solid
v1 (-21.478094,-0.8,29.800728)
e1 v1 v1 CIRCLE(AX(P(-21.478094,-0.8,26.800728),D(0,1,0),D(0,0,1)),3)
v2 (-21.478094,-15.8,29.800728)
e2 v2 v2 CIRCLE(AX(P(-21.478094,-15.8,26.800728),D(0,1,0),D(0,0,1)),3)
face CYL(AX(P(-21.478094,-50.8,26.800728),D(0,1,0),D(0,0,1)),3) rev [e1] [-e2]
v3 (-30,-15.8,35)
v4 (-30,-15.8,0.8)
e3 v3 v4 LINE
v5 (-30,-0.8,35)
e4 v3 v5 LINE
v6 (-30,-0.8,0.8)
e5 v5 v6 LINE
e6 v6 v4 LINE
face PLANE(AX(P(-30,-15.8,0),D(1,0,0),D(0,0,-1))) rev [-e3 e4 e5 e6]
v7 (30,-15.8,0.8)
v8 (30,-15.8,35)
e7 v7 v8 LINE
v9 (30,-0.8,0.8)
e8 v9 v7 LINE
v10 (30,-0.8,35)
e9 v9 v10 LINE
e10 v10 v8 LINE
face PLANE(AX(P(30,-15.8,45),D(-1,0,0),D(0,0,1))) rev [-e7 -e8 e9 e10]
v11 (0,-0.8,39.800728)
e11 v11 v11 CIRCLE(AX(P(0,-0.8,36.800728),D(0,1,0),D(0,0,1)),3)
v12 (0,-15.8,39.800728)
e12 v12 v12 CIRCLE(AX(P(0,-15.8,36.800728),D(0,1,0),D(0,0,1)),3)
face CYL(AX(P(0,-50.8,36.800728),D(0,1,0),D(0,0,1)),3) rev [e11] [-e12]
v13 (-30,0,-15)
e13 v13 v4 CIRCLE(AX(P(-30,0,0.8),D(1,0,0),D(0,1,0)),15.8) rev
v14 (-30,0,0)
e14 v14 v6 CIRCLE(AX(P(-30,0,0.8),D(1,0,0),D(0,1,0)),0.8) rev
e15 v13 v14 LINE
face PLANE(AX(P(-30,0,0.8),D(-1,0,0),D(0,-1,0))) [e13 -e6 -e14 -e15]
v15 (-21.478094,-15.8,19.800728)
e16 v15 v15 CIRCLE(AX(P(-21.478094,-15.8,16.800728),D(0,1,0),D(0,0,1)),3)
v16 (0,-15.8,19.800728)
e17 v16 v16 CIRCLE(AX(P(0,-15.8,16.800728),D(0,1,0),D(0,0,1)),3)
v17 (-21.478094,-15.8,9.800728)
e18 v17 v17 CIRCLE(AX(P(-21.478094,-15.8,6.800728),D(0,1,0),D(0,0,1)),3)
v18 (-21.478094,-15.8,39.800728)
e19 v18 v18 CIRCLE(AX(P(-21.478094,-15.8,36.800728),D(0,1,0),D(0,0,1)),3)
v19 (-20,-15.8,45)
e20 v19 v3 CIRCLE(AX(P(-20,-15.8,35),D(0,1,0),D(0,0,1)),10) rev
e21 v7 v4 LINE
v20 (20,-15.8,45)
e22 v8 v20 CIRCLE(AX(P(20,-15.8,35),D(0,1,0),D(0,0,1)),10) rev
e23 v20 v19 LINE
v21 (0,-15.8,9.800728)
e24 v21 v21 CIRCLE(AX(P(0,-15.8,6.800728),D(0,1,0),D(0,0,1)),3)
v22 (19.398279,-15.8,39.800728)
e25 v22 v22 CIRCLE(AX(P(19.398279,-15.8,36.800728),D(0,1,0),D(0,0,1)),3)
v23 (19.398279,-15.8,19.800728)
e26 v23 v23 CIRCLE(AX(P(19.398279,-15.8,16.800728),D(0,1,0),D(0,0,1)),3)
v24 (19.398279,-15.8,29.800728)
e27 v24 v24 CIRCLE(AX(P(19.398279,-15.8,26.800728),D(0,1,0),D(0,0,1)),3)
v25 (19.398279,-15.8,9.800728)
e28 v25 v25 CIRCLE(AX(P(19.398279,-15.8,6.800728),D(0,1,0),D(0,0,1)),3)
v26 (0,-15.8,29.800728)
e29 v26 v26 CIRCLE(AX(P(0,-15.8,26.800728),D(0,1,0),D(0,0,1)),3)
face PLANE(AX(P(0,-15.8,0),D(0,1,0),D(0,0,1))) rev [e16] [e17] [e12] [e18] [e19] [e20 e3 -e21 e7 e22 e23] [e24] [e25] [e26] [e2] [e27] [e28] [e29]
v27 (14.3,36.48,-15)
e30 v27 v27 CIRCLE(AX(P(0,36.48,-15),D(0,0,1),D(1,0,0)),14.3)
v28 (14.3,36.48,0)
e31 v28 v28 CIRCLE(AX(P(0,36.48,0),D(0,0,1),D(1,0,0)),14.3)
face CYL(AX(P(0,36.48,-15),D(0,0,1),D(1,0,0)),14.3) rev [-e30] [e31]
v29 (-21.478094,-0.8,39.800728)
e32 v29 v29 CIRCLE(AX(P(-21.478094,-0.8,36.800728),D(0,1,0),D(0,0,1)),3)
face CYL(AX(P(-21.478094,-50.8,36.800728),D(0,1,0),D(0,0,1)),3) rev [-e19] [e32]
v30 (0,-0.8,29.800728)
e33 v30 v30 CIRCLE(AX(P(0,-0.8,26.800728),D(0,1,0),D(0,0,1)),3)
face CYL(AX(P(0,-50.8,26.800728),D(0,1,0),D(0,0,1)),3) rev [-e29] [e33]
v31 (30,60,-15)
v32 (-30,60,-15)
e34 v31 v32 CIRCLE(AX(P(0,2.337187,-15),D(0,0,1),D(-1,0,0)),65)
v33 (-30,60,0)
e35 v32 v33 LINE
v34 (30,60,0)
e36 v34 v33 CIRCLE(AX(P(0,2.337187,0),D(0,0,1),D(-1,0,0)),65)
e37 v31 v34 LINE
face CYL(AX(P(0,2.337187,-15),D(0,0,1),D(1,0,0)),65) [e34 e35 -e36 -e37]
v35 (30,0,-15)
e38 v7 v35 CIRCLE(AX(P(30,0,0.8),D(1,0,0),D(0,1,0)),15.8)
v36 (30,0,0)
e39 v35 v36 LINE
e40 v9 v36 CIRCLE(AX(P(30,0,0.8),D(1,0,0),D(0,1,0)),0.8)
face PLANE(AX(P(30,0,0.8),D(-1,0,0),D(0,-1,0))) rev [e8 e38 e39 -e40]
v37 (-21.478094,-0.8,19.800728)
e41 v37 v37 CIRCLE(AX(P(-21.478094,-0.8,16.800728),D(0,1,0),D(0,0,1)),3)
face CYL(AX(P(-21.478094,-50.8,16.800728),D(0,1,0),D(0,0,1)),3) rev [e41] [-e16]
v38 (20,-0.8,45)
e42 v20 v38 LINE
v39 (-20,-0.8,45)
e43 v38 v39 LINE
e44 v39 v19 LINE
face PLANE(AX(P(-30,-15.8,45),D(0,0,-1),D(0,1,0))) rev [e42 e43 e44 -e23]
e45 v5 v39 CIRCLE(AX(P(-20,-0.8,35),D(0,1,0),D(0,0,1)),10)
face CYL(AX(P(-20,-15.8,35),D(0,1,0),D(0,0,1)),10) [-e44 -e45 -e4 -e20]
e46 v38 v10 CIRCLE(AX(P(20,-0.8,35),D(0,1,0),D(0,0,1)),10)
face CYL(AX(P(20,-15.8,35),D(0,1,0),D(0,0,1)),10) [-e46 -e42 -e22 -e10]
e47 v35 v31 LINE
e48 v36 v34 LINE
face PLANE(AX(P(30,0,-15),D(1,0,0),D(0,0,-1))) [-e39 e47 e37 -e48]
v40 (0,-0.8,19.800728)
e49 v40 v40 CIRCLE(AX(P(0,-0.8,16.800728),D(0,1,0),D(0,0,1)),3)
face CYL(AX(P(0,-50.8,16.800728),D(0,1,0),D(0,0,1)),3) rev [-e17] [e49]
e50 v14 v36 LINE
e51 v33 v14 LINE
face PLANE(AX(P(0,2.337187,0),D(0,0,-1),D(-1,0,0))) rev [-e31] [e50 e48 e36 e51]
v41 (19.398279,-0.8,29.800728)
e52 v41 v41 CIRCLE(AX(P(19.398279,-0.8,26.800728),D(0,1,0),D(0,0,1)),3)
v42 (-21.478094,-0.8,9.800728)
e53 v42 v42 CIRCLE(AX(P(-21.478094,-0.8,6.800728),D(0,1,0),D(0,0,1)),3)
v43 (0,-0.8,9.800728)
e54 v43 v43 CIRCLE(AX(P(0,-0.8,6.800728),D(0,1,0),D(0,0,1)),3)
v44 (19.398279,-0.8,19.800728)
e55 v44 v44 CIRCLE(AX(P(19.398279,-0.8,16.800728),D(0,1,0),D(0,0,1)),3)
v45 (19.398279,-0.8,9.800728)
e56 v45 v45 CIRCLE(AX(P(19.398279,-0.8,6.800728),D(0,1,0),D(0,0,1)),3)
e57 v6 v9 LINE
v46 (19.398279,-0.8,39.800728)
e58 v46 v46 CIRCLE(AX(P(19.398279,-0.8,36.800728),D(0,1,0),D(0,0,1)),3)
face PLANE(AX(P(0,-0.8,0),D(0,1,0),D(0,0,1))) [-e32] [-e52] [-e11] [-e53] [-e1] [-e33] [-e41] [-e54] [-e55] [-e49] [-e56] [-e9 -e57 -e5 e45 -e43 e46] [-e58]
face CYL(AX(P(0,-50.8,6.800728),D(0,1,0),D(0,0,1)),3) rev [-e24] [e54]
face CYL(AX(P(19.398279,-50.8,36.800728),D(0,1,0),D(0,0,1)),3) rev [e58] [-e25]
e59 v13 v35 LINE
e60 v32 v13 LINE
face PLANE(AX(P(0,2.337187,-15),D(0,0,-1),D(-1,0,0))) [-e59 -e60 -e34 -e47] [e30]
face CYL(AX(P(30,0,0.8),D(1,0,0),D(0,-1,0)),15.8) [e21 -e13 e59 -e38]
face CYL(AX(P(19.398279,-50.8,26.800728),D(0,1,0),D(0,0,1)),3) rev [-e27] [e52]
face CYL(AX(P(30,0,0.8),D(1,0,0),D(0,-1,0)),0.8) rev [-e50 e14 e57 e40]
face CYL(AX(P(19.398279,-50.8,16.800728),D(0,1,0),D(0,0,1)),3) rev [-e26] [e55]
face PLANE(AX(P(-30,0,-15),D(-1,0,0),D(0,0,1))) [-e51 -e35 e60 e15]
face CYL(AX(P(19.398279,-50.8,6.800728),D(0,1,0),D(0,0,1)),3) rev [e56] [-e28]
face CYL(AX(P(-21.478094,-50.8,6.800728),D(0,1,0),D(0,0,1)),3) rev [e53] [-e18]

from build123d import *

# Parameters (mm, degrees)
SKETCH1_R          = 14.3
BASE_FLANGE1_DEPTH = 15
EDGE_FLANGE1_DEPTH = 60
SKETCH9_R          = 3
CUT_EXTRUDE1_DEPTH = 50
FILLET1_R          = 10


# Sheet-metal steps are written as plain solids
with BuildPart() as part:
    # Sketch1 → Base-Flange1 (new body)
    with BuildSketch(Plane.XY):
        with BuildLine():
            Line((-30, 0), (30, 0))
            Line((30, 0), (30, 60))
            ThreePointArc((30, 60), (0, 67.337187027), (-30, 60))
            Line((-30, 60), (-30, 0))
        make_face()
        with Locations((0, 36.48)):
            Circle(SKETCH1_R, mode=Mode.SUBTRACT)
    extrude(amount=-BASE_FLANGE1_DEPTH)

    # Edge-Flange1 section (across the edge) → Edge-Flange1 (add)
    with BuildSketch(Plane(origin=(-30, -0.8, 0), x_dir=(0, 1, 0), z_dir=(1, 0, 0))):
        with BuildLine():
            Line((-15, 0.8), (-15, 45))
            Line((-15, 45), (0, 45))
            Line((0, 45), (0, 0.8))
            ThreePointArc((0, 0.8), (0.234314575, 0.234314575), (0.8, 0))
            Line((0.8, 0), (0.8, -15))
            ThreePointArc((0.8, -15), (-10.372287143, -10.372287143), (-15, 0.8))
        make_face()
    extrude(amount=EDGE_FLANGE1_DEPTH)

    # Sketch9 → Cut-Extrude1 (cut)
    with BuildSketch(Plane(origin=(0, -0.8, 0), x_dir=(1, 0, 0), z_dir=(0, 1, 0))):
        with Locations(Location((-21.478093951, -6.800727635, 0), (0, 0, 270))):
            Circle(SKETCH9_R)
        with Locations(Location((19.398278521, -6.800727635, 0), (0, 0, 270))):
            Circle(SKETCH9_R)
        with Locations(Location((0, -6.800727635, 0), (0, 0, 270))):
            Circle(SKETCH9_R)
        with Locations(Location((-21.478093951, -16.800727635, 0), (0, 0, 270))):
            Circle(SKETCH9_R)
        with Locations(Location((-21.478093951, -26.800727635, 0), (0, 0, 270))):
            Circle(SKETCH9_R)
        with Locations(Location((-21.478093951, -36.800727635, 0), (0, 0, 270))):
            Circle(SKETCH9_R)
        with Locations(Location((0, -16.800727635, 0), (0, 0, 270))):
            Circle(SKETCH9_R)
        with Locations(Location((0, -26.800727635, 0), (0, 0, 270))):
            Circle(SKETCH9_R)
        with Locations(Location((0, -36.800727635, 0), (0, 0, 270))):
            Circle(SKETCH9_R)
        with Locations(Location((19.398278521, -16.800727635, 0), (0, 0, 270))):
            Circle(SKETCH9_R)
        with Locations(Location((19.398278521, -26.800727635, 0), (0, 0, 270))):
            Circle(SKETCH9_R)
        with Locations(Location((19.398278521, -36.800727635, 0), (0, 0, 270))):
            Circle(SKETCH9_R)
    extrude(amount=-CUT_EXTRUDE1_DEPTH, mode=Mode.SUBTRACT)

    # Fillet1
    fillet1_edges = [part.edges().sort_by_distance(p)[0] for p in [
        (-30, -8.3, 45),
        (30, -8.3, 45),
    ]]
    fillet(fillet1_edges, radius=FILLET1_R)


solid = part.part
